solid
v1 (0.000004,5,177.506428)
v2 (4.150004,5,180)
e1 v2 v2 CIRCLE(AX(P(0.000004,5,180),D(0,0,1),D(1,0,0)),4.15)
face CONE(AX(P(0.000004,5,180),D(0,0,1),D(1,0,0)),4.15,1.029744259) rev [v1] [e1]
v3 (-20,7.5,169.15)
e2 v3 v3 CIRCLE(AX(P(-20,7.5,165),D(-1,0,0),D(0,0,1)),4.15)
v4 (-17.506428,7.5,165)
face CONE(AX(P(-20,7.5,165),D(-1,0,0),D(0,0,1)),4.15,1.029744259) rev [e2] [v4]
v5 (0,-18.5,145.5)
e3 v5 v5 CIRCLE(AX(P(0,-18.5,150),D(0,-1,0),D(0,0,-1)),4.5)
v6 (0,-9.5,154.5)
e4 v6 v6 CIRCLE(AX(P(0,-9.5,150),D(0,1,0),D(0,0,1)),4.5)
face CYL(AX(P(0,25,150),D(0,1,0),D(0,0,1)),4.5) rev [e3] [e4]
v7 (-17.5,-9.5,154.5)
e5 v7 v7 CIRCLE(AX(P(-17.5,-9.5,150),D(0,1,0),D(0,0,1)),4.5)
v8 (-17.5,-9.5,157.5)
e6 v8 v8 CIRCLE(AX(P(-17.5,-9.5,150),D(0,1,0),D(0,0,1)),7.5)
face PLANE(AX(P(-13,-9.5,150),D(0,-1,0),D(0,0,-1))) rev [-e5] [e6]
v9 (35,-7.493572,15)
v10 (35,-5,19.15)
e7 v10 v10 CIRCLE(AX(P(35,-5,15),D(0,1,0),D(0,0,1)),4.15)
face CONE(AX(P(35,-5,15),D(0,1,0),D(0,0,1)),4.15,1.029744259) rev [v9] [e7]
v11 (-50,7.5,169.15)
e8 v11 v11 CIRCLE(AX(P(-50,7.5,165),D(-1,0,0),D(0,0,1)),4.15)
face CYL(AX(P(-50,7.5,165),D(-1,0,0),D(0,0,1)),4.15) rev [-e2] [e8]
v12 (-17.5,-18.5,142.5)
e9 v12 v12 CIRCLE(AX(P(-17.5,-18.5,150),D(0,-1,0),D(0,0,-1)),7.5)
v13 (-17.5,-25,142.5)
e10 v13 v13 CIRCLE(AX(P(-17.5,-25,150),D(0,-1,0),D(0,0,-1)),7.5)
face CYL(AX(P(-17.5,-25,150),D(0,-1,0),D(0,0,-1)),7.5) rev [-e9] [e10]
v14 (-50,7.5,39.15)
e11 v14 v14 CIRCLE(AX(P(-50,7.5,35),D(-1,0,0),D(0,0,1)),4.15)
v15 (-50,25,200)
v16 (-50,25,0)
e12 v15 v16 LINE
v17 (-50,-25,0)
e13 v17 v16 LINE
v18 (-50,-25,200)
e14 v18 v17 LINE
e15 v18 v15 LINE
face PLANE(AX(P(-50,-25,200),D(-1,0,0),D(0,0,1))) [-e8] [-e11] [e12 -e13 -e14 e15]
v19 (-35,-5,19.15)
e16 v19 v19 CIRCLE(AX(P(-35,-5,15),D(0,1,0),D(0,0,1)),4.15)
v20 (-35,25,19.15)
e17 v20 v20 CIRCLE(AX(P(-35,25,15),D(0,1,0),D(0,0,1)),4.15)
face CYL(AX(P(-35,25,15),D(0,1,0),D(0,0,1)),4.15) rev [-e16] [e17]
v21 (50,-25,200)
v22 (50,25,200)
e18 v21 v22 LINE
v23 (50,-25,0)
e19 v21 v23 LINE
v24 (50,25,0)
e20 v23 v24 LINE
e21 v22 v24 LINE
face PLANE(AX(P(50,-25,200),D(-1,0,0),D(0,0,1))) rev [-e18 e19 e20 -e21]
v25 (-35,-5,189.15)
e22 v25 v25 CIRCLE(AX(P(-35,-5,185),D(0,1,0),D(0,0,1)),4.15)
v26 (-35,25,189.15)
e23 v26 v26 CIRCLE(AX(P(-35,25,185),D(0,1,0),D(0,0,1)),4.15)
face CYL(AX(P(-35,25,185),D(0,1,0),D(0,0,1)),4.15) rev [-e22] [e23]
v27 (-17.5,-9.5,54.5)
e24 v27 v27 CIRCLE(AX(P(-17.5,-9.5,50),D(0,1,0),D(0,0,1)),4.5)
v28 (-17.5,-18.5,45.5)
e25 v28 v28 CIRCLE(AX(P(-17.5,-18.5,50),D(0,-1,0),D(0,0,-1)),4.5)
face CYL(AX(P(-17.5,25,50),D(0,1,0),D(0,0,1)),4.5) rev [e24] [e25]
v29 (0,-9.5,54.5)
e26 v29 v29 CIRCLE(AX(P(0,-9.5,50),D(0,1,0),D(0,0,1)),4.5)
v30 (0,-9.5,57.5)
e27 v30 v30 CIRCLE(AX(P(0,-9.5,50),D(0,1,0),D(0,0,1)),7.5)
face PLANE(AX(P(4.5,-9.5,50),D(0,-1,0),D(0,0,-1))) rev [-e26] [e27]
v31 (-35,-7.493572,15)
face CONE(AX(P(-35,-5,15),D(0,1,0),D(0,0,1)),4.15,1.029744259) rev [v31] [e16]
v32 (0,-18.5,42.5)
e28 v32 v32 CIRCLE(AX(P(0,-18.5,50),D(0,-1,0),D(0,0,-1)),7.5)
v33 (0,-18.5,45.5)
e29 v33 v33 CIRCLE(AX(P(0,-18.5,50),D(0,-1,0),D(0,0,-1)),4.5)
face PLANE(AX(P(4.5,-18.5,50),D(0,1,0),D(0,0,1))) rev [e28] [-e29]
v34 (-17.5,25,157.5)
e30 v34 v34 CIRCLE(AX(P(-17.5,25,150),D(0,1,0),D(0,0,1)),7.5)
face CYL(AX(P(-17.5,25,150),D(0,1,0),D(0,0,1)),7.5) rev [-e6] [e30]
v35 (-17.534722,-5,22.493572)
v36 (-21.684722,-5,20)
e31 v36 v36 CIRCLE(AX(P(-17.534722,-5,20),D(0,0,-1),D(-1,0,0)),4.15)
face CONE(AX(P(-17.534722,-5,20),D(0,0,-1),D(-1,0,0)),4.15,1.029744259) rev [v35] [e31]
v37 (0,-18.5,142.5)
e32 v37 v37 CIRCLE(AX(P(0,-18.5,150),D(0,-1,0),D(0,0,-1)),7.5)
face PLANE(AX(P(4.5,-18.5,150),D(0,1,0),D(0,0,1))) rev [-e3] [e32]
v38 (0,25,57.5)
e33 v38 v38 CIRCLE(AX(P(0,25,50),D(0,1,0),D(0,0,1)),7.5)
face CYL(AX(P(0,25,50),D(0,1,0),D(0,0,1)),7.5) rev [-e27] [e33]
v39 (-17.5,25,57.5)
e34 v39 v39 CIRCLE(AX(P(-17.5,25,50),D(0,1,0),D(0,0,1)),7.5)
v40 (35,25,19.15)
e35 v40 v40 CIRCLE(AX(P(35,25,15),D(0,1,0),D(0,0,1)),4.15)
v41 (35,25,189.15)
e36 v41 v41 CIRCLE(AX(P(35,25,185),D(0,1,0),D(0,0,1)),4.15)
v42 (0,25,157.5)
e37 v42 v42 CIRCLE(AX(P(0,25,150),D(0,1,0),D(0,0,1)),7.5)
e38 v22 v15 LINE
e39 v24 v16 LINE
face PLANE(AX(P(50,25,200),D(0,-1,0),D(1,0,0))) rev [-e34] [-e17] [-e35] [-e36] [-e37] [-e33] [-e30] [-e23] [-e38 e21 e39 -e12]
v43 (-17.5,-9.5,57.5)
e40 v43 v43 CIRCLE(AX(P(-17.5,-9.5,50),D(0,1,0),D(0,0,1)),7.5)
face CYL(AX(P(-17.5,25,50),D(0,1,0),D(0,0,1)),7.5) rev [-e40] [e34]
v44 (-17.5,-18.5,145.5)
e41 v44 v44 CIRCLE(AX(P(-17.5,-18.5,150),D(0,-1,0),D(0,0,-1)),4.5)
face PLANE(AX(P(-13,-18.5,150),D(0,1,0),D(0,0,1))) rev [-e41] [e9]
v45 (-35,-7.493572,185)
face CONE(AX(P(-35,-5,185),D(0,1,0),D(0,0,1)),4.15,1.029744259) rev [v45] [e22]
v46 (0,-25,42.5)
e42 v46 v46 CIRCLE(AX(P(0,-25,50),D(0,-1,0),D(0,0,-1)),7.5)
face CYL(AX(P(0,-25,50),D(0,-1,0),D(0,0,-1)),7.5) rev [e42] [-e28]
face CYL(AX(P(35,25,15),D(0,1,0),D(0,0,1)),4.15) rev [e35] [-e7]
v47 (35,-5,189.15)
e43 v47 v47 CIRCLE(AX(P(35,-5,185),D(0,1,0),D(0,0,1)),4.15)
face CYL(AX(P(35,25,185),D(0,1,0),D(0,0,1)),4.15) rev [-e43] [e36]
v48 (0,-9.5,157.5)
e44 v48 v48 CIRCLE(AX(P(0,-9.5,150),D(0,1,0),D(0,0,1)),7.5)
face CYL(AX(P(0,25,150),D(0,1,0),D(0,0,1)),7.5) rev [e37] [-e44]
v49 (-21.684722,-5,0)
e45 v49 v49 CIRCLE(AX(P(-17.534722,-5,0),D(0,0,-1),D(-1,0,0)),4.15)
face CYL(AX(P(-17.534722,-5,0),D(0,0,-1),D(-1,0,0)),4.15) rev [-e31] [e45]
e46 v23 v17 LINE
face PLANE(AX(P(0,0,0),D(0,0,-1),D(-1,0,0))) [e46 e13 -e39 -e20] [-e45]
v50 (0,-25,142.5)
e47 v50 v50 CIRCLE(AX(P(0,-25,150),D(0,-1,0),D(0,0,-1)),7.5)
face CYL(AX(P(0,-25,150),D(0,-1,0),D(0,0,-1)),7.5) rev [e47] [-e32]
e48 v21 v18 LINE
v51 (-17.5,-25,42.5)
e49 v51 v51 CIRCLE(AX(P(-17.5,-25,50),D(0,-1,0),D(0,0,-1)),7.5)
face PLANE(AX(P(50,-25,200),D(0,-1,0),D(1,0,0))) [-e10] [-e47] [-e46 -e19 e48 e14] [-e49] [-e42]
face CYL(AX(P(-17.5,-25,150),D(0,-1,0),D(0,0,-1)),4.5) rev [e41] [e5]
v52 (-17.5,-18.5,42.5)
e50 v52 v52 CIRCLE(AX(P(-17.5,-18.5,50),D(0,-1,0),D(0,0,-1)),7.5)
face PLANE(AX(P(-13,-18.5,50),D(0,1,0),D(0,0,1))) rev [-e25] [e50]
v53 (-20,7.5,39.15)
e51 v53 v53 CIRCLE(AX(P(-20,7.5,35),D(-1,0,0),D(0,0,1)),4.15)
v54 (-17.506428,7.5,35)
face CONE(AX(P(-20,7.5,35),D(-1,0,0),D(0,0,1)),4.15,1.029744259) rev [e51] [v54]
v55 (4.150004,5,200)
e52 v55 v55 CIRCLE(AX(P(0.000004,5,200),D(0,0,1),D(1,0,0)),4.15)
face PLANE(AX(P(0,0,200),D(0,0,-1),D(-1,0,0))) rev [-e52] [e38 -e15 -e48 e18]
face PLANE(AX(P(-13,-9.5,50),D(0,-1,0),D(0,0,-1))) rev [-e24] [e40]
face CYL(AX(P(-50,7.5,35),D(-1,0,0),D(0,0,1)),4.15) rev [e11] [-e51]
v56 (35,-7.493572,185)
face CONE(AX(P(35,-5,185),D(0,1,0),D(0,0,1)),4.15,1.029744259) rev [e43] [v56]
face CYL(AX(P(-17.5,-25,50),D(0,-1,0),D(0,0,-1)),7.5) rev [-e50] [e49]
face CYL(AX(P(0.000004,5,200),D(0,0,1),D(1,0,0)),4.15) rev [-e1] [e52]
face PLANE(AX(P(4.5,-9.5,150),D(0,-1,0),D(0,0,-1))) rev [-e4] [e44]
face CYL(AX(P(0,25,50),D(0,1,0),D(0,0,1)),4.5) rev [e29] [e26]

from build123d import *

# Parameters (mm, degrees)
SKIZZE1_W                                           = 100
SKIZZE1_H                                           = 50
AUFSATZ_LINEAR_AUSTRAGEN1_DEPTH                     = 200
STIRNSENKUNG_F_R_M8_SENKSCHRAUBE_KOPF_B_D           = 9
STIRNSENKUNG_F_R_M8_SENKSCHRAUBE_KOPF_B_CBORE_D     = 15
STIRNSENKUNG_F_R_M8_SENKSCHRAUBE_KOPF_B_CBORE_DEPTH = 34.5
STIRNSENKUNG_F_R_M8_SENKSCHRAUBE_KO_2_D             = 9
STIRNSENKUNG_F_R_M8_SENKSCHRAUBE_KO_2_DEPTH         = 50
STIRNSENKUNG_F_R_M8_SENKSCHRAUBE_KO_2_CBORE_D       = 15
STIRNSENKUNG_F_R_M8_SENKSCHRAUBE_KO_2_CBORE_DEPTH   = 6.5
SPIEGELN4_COPY_1_D                                  = 9
SPIEGELN4_COPY_1_CBORE_D                            = 15
SPIEGELN4_COPY_1_CBORE_DEPTH                        = 34.5
SPIEGELN4_COPY_2_D                                  = 9
SPIEGELN4_COPY_2_DEPTH                              = 50
SPIEGELN4_COPY_2_CBORE_D                            = 15
SPIEGELN4_COPY_2_CBORE_DEPTH                        = 6.5
KERNLOCH_F_R_M8_HELICOIL3_D                         = 8.3
KERNLOCH_F_R_M8_HELICOIL3_DEPTH                     = 20
KERNLOCH_F_R_M8_HELICOIL3_TIP                       = 2.493571569
KERNLOCH_F_R_M8_HELICOIL4_D                         = 8.3
KERNLOCH_F_R_M8_HELICOIL4_DEPTH                     = 20
KERNLOCH_F_R_M8_HELICOIL4_TIP                       = 2.493571569


# Read off the part's stored shape, not the designer's step: Kernloch für M8 Helicoil2
with BuildPart() as part:
    # Skizze1 → Aufsatz-Linear austragen1 (new body)
    with BuildSketch(Plane.XY):
        Rectangle(SKIZZE1_W, SKIZZE1_H)
    extrude(amount=AUFSATZ_LINEAR_AUSTRAGEN1_DEPTH)

    # Stirnsenkung f_r M8 Senkschraube _Kopf B (through all)
    with Locations(Plane(origin=(0, 25, 0), x_dir=(1, 0, 0), z_dir=(0, 1, 0))):
        with Locations((0, -150)):
            stirnsenkung_f_r_m8_senkschraube_kopf_b = CounterBoreHole(STIRNSENKUNG_F_R_M8_SENKSCHRAUBE_KOPF_B_D / 2, STIRNSENKUNG_F_R_M8_SENKSCHRAUBE_KOPF_B_CBORE_D / 2, STIRNSENKUNG_F_R_M8_SENKSCHRAUBE_KOPF_B_CBORE_DEPTH)

    # Stirnsenkung f_r M8 Senkschraube _Ko 2
    with Locations(Plane(origin=(0, -25, 0), x_dir=(-1, 0, 0), z_dir=(0, -1, 0))):
        with Locations((0, -150)):
            stirnsenkung_f_r_m8_senkschraube_ko_2 = CounterBoreHole(STIRNSENKUNG_F_R_M8_SENKSCHRAUBE_KO_2_D / 2, STIRNSENKUNG_F_R_M8_SENKSCHRAUBE_KO_2_CBORE_D / 2, STIRNSENKUNG_F_R_M8_SENKSCHRAUBE_KO_2_CBORE_DEPTH, depth=STIRNSENKUNG_F_R_M8_SENKSCHRAUBE_KO_2_DEPTH)

    # Spiegeln1: Stirnsenkung f_r M8 Senkschraube _Kopf B, Stirnsenkung f_r M8 Senkschraube _Ko 2 across plane
    add(stirnsenkung_f_r_m8_senkschraube_kopf_b.mirror(Plane.XY.offset(100)), mode=Mode.SUBTRACT)
    add(stirnsenkung_f_r_m8_senkschraube_ko_2.mirror(Plane.XY.offset(100)), mode=Mode.SUBTRACT)

    # Skizze10 → Kernloch für M8 Helicoil1 (revolve, cut)
    with BuildSketch(Plane(origin=(-35, 25, 185), x_dir=(0, 0, 1), z_dir=(1, 0, 0))):
        Polygon((0, 0), (0, 32.493571569), (4.15, 30), (4.15, 0), align=None)
    kernloch_f_r_m8_helicoil1 = revolve(axis=Axis((-35, 31.35, 185), (0, -1, 0)), mode=Mode.SUBTRACT)

    # Spiegeln2: Kernloch für M8 Helicoil1 across plane
    add(kernloch_f_r_m8_helicoil1.mirror(Plane(origin=(0, 0, 0), x_dir=(0, 0, 1), z_dir=(1, 0, 0))), mode=Mode.SUBTRACT)

    # Spiegeln3: Kernloch für M8 Helicoil1 across plane
    add(kernloch_f_r_m8_helicoil1.mirror(Plane.XY.offset(100)), mode=Mode.SUBTRACT)

    # Spiegeln3 copy 1 sketch → Spiegeln3 copy 1 (revolve, cut)
    with BuildSketch(Plane(origin=(35, 25, 15), x_dir=(0, 0, -1), z_dir=(-1, 0, 0))):
        Polygon((0, 0), (0, 32.493571569), (4.15, 30), (4.15, 0), align=None)
    revolve(axis=Axis((35, 31.35, 15), (0, -1, 0)), mode=Mode.SUBTRACT)

    # Kernloch für M8 Helicoil2 outline → Kernloch für M8 Helicoil2 (revolve, cut)
    with BuildSketch(Plane(origin=(0, 7.5, 35), x_dir=(0, 1, 0), z_dir=(0, 0, -1))):
        Polygon((4.15, -20), (0, -17.506428431), (0, -50), (4.15, -50), align=None)
    revolve(axis=Axis((0, 7.5, 35), (1, 0, 0)), mode=Mode.SUBTRACT)

    # Kernloch f_r M8 Helicoil2 2 outline → Kernloch f_r M8 Helicoil2 2 (revolve, cut)
    with BuildSketch(Plane(origin=(0, 7.5, 165), x_dir=(0, 1, 0), z_dir=(0, 0, -1))):
        Polygon((4.15, -20), (0, -17.506428431), (0, -50), (4.15, -50), align=None)
    revolve(axis=Axis((0, 7.5, 165), (1, 0, 0)), mode=Mode.SUBTRACT)

    # Spiegeln4: Stirnsenkung f_r M8 Senkschraube _Kopf B, Stirnsenkung f_r M8 Senkschraube _Ko 2 across plane
    add(stirnsenkung_f_r_m8_senkschraube_kopf_b.mirror(Plane(origin=(-8.75, 0, 0), x_dir=(0, 0, 1), z_dir=(1, 0, 0))), mode=Mode.SUBTRACT)
    add(stirnsenkung_f_r_m8_senkschraube_ko_2.mirror(Plane(origin=(-8.75, 0, 0), x_dir=(0, 0, 1), z_dir=(1, 0, 0))), mode=Mode.SUBTRACT)

    # Spiegeln4 copy 1 (through all)
    with Locations(Plane(origin=(-17.5, 25, 200), x_dir=(-1, 0, 0), z_dir=(0, 1, 0))):
        with Locations((0, -150)):
            CounterBoreHole(SPIEGELN4_COPY_1_D / 2, SPIEGELN4_COPY_1_CBORE_D / 2, SPIEGELN4_COPY_1_CBORE_DEPTH)

    # Spiegeln4 copy 2
    with Locations(Plane(origin=(-17.5, -25, 200), x_dir=(1, 0, 0), z_dir=(0, -1, 0))):
        with Locations((0, -150)):
            CounterBoreHole(SPIEGELN4_COPY_2_D / 2, SPIEGELN4_COPY_2_CBORE_D / 2, SPIEGELN4_COPY_2_CBORE_DEPTH, depth=SPIEGELN4_COPY_2_DEPTH)

    # Kernloch für M8 Helicoil3
    with Locations(Plane.XY.offset(200)):
        with Locations((4.444e-06, 5)):
            Hole(KERNLOCH_F_R_M8_HELICOIL3_D / 2, depth=KERNLOCH_F_R_M8_HELICOIL3_DEPTH)
            with Locations((0, 0, -(KERNLOCH_F_R_M8_HELICOIL3_DEPTH + KERNLOCH_F_R_M8_HELICOIL3_TIP / 2))):  # 118° drill point
                Cone(0, KERNLOCH_F_R_M8_HELICOIL3_D / 2, KERNLOCH_F_R_M8_HELICOIL3_TIP, mode=Mode.SUBTRACT)

    # Kernloch für M8 Helicoil4
    with Locations(Plane(origin=(0, 0, 0), x_dir=(-1, 0, 0), z_dir=(0, 0, -1))):
        with Locations((17.534722222, -5)):
            Hole(KERNLOCH_F_R_M8_HELICOIL4_D / 2, depth=KERNLOCH_F_R_M8_HELICOIL4_DEPTH)
            with Locations((0, 0, -(KERNLOCH_F_R_M8_HELICOIL4_DEPTH + KERNLOCH_F_R_M8_HELICOIL4_TIP / 2))):  # 118° drill point
                Cone(0, KERNLOCH_F_R_M8_HELICOIL4_D / 2, KERNLOCH_F_R_M8_HELICOIL4_TIP, mode=Mode.SUBTRACT)


solid = part.part
